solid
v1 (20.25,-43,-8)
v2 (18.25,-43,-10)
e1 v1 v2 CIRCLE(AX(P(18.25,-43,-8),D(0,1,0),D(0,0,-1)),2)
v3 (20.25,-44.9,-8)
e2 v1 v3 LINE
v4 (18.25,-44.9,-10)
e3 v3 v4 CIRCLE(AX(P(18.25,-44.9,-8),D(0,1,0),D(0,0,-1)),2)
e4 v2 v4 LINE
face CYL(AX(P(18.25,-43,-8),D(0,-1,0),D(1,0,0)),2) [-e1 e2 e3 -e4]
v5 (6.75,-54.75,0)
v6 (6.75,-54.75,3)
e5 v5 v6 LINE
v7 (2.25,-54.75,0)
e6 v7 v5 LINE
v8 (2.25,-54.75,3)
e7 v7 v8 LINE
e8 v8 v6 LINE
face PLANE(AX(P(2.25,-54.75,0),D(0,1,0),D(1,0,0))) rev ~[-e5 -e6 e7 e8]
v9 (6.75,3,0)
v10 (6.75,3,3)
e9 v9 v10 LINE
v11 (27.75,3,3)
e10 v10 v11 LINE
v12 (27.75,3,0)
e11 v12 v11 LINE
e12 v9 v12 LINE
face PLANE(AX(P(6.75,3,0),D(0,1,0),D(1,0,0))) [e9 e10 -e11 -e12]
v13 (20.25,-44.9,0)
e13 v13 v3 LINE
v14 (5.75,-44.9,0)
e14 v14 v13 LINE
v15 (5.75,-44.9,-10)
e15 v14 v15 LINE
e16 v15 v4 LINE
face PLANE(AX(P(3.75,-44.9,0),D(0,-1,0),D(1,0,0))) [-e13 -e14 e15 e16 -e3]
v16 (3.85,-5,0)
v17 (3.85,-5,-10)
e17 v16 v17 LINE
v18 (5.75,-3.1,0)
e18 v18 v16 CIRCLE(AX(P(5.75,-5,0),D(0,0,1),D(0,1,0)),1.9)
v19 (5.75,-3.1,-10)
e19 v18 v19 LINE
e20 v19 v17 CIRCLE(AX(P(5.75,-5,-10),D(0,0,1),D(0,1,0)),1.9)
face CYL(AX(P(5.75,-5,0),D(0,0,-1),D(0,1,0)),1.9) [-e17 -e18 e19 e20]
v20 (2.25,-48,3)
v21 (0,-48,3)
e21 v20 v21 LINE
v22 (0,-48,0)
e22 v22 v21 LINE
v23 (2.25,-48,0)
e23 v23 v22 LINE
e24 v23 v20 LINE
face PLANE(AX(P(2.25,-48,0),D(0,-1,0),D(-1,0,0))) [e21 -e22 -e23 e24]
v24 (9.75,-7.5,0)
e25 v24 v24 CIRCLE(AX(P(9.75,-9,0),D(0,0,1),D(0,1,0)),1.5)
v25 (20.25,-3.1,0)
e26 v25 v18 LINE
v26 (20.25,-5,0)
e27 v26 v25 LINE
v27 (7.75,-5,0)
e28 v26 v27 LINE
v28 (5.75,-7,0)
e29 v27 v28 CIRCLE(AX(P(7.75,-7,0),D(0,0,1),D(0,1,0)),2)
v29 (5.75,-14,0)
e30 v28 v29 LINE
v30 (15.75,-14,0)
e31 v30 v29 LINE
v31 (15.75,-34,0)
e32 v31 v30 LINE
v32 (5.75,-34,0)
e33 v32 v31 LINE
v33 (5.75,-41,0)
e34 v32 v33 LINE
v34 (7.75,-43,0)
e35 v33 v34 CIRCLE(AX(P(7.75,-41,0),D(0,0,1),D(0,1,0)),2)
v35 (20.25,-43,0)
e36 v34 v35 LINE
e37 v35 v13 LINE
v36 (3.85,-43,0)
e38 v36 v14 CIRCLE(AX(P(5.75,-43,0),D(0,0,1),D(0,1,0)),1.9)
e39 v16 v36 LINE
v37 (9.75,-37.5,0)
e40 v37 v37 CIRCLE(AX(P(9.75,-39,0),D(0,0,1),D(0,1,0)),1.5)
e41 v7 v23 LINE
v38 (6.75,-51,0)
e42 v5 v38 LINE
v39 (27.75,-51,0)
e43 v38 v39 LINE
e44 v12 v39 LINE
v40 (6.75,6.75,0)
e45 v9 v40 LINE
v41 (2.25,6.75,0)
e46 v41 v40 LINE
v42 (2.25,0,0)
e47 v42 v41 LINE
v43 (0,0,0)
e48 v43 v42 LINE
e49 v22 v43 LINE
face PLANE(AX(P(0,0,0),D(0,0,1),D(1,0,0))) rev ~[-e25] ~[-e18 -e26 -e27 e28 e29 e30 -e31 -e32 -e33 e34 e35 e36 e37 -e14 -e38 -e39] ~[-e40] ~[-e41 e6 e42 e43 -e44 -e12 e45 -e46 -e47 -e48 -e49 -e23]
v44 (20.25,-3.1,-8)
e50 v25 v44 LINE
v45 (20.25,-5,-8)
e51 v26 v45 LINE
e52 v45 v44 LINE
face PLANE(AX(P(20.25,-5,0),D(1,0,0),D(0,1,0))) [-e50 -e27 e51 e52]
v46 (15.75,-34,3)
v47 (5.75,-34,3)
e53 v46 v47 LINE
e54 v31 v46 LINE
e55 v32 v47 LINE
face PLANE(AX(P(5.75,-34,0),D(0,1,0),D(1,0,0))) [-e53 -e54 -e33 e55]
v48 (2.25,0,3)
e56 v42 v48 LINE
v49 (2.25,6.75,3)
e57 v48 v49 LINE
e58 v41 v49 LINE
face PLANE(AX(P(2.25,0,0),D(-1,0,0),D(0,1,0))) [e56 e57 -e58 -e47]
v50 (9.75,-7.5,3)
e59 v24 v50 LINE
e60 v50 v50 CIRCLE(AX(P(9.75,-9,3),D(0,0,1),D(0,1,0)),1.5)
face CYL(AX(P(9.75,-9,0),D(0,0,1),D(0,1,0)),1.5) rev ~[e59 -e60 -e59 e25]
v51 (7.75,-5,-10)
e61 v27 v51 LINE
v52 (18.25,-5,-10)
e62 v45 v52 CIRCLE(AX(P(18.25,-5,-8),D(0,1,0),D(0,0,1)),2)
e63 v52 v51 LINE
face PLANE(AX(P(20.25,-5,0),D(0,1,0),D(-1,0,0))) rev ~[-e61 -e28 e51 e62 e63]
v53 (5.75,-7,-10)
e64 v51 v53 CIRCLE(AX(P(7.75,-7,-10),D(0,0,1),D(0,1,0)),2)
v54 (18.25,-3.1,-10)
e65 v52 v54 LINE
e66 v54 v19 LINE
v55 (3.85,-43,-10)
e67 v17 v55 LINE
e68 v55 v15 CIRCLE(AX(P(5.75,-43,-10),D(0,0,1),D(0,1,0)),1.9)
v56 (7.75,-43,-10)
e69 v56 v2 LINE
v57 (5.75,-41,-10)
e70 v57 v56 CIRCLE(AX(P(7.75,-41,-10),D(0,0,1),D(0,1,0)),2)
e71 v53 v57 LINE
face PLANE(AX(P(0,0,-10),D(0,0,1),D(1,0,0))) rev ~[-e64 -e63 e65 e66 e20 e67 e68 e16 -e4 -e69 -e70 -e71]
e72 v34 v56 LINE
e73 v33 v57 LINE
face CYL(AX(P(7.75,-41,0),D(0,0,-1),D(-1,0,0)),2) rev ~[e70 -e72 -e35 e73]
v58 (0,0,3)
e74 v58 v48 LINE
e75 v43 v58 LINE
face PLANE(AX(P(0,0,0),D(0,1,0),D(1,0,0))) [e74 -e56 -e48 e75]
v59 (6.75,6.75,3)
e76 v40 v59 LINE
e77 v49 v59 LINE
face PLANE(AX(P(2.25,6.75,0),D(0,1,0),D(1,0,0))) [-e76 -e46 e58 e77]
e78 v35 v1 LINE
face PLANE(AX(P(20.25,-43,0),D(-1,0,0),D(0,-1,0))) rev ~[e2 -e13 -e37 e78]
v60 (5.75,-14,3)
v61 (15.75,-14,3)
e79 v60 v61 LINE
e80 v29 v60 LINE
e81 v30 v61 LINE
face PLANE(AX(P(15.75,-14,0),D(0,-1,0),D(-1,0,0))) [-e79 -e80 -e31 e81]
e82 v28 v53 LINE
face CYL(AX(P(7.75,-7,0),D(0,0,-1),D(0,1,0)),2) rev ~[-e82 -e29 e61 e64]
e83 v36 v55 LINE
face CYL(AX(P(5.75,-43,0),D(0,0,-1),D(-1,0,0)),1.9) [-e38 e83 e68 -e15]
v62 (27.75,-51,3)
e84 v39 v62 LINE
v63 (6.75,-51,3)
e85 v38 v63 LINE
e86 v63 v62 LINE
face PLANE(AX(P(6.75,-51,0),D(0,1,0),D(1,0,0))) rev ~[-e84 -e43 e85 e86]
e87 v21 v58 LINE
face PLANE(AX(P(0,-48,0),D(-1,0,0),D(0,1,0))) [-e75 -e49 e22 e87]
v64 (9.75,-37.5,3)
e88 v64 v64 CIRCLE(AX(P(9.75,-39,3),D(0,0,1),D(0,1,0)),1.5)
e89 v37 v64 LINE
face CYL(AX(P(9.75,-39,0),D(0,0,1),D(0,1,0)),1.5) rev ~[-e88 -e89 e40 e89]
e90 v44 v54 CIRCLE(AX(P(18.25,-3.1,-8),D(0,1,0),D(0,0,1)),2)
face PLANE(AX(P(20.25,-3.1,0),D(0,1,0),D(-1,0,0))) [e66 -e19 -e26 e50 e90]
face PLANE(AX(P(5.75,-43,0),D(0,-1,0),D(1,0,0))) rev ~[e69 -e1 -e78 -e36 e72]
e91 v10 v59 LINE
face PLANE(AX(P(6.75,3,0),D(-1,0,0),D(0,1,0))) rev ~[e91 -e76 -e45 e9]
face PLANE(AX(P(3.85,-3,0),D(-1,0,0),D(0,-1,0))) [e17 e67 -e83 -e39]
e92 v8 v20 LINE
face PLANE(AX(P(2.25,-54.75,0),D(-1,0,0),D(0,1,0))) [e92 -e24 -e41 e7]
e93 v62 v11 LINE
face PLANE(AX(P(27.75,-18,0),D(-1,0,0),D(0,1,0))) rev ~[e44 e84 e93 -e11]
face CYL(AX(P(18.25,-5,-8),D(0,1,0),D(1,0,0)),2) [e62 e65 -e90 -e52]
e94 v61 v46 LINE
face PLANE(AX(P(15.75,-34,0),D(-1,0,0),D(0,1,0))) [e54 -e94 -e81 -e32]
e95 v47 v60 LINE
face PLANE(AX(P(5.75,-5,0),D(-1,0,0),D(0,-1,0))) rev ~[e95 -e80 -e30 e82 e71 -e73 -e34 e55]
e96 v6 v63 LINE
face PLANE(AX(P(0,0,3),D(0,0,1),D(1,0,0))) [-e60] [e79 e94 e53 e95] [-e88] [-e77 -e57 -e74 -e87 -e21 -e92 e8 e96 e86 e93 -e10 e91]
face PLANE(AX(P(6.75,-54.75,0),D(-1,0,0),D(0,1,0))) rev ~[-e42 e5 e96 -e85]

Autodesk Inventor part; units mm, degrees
ref_plane "YZ Plane" through (0, 0, 0) normal (1, 0, 0) x (0, 1, 0)
ref_plane "XZ Plane" through (0, 0, 0) normal (0, 1, 0) x (-1, 0, 0)
ref_plane "XY Plane" through (0, 0, 0) normal (0, 0, 1) x (1, 0, 0)
ref_plane "Work Plane1" through (0, 0, 0) normal (0, 0, 1) x (1, 0, 0)
sketch "Sketch1" plane through (0, 0, 0) normal (0, 0, 1) x (1, 0, 0)
  line L0 (0, 0) -> (23.25, 0) projected
  line L1 (0, -48) -> (0, 0) projected
  line L2 (23.25, -48) -> (0, -48) projected
  line L3 (23.25, -48) -> (23.25, -31.5) projected
  line L4 (23.25, -31.5) -> (26.25, -31.5) projected
  line L5 (27.75, -30) -> (26.25, -31.5) projected
  line L6 (27.75, -30) -> (27.75, -18) projected
  line L7 (27.75, -18) -> (26.25, -16.5) projected
  line L8 (23.25, -16.5) -> (26.25, -16.5) projected
  line L9 (23.25, 0) -> (23.25, -16.5) projected
  line L10 (20.25, -16.5) -> (20.25, -3) projected
  line L11 (17.25, -16.5) -> (20.25, -16.5) projected
  line L12 (17.25, -16.5) -> (17.25, -19.5) projected
  line L13 (26.25, -19.5) -> (26.25, -28.5) projected
  line L14 (17.25, -28.5) -> (17.25, -31.5) projected
  line L15 (17.25, -31.5) -> (20.25, -31.5) projected
  line L16 (20.25, -31.5) -> (20.25, -45) projected
  line L17 (3.75, -45) -> (20.25, -45) projected
  line L18 (3.75, -3) -> (3.75, -45) projected
  line L19 (20.25, -3) -> (3.75, -3) projected
  line L20 (17.25, -19.5) -> (17.25, -28.5)
  line L21 (18.25, -33.5) -> (15.25, -33.5)
  line L22 (15.25, -33.5) -> (15.25, -28.5)
  line L23 (15.25, -28.5) -> (15.25, -19.5)
  line L24 (15.25, -19.5) -> (15.25, -14.5)
  line L25 (15.25, -14.5) -> (18.25, -14.5)
  line L26 (20.25, -5) -> (5.75, -5)
  line L27 (5.75, -5) -> (5.75, -43)
  line L28 (5.75, -43) -> (20.25, -43)
extrude "Extrusion1" add sketch "Sketch1" against normal blind 10 contours L26 L27 L28 L16 L17 L18 L19 L10
sketch "Sketch2" plane through (0, 0, 0) normal (0, 0, 1) x (1, 0, 0)
  line L0 (2.25, 0) -> (2.25, 6.75) projected
  line L1 (2.25, 0) -> (3.3, 0) projected
  line L2 (3.3, 0) -> (3.3, 5.7) projected
  line L3 (5.7, 5.7) -> (3.3, 5.7) projected
  line L4 (5.7, 1.95) -> (5.7, 5.7) projected
  line L5 (26.7, 1.95) -> (5.7, 1.95) projected
  line L6 (26.7, 1.95) -> (26.7, -16.95) projected
  line L7 (26.7, -16.95) -> (27.75, -18) projected
  line L8 (27.75, -18) -> (27.75, 3) projected
  line L9 (6.75, 3) -> (27.75, 3) projected
  line L10 (6.75, 3) -> (6.75, 6.75) projected
  line L11 (2.25, 6.75) -> (6.75, 6.75) projected
  line L12 (2.25, -54.75) -> (2.25, -48) projected
  line L13 (2.25, -54.75) -> (6.75, -54.75) projected
  line L14 (6.75, -54.75) -> (6.75, -51) projected
  line L15 (6.75, -51) -> (27.75, -51) projected
  line L16 (27.75, -51) -> (27.75, -30) projected
  line L17 (26.7, -31.05) -> (27.75, -30) projected
  line L18 (26.7, -31.05) -> (26.7, -49.95) projected
  line L19 (26.7, -49.95) -> (5.7, -49.95) projected
  line L20 (5.7, -49.95) -> (5.7, -53.7) projected
  line L21 (3.3, -53.7) -> (5.7, -53.7) projected
  line L22 (3.3, -53.7) -> (3.3, -48) projected
  line L23 (2.25, -48) -> (3.3, -48) projected
  line L24 (0, 0) -> (23.25, 0) projected
  line L25 (0, -48) -> (0, 0) projected
  line L26 (23.25, -48) -> (0, -48) projected
  line L27 (23.25, -48) -> (23.25, -31.5) projected
  line L28 (23.25, -31.5) -> (26.25, -31.5) projected
  line L29 (27.75, -30) -> (26.25, -31.5) projected
  line L30 (27.75, -30) -> (27.75, -18) projected
  line L31 (27.75, -18) -> (26.25, -16.5) projected
  line L32 (23.25, -16.5) -> (26.25, -16.5) projected
  line L33 (23.25, 0) -> (23.25, -16.5) projected
  line L34 (20.25, -16.5) -> (20.25, -3) projected
  line L35 (17.25, -16.5) -> (20.25, -16.5) projected
  line L36 (17.25, -16.5) -> (17.25, -19.5) projected
  line L37 (17.25, -19.5) -> (26.25, -19.5) projected
  line L38 (26.25, -19.5) -> (26.25, -28.5) projected
  line L39 (17.25, -28.5) -> (26.25, -28.5) projected
  line L40 (17.25, -28.5) -> (17.25, -31.5) projected
  line L41 (17.25, -31.5) -> (20.25, -31.5) projected
  line L42 (20.25, -31.5) -> (20.25, -45) projected
  line L43 (3.75, -45) -> (20.25, -45) projected
  line L44 (3.75, -3) -> (3.75, -45) projected
  line L45 (20.25, -3) -> (3.75, -3) projected
extrude "Extrusion2" add sketch "Sketch2" along normal blind 3 contours L0 L11 L10 L9 L8 L7 L6 L5 L4 L3 L2 L1 | L1 L24 L33 L32 L31 L7 L30 L17 L29 L28 L27 L26 L23 L25 | L2 L3 L4 L5 L6 L31 L32 L33 L24 | L23 L22 L21 L20 L19 L18 L17 L16 L15 L14 L13 L12 | L26 L27 L28 L29 L18 L19 L20 L21 L22 | L35 L36 L37 L38 L39 L40 L41 L42 L43 L44 L45 L34
sketch "Sketch3" plane through (0, 0, 0) normal (0, 0, -1) x (-1, 0, 0)
  line L0 (-5.75, -34) -> (-15.75, -34)
  line L1 (-15.75, -34) -> (-15.75, -14)
  line L2 (-15.75, -14) -> (-5.75, -14)
  line L3 (-5.75, -14) -> (-5.75, -34)
  line L4 (-3.75, -45) -> (-3.75, -3) construction
  line L5 (-3.75, -24) -> (-33.6662, -24) construction
  line L6 (-5.75, -5) -> (-5.75, -43) construction
  point P0 (0, 0)
  dimension "d5" = 10
  dimension "d6" = 20
extrude "Extrusion3" cut sketch "Sketch3" against normal through all
sketch "Sketch4" plane through (0, 0, 0) normal (0, 0, -1) x (-1, 0, 0)
  line L0 (-20.25, -5) -> (-5.75, -5) projected
  line L1 (-5.75, -43) -> (-20.25, -43) projected
  line L2 (-5.75, -5) -> (-5.75, -43) projected
  point P0 (0, 0)
  point P1 (-9.75, -9)
  point P2 (-9.75, -39)
  dimension "d9" = 4
  dimension "d10" = 4
  dimension "d11" = 4
  dimension "d12" = 4
hole "Hole1" at (9.75, -9, 0) at (9.75, -39, 0) direction (0, 0, 1) diameter 3 end through all
fillet "Fillet1" radius 2 6 edges at (20.25, -4, -10) (20.25, -44, -10) (3.75, -3, -5) (3.75, -45, -5) (5.75, -43, -5) (5.75, -5, -5)
thicken "Thicken1" operation add thickness 0.1 both sides no extend neighbours yes toward (0, 1, 0) faces at (14.75, -45, -3.3333) (4.75, -44.732, -3.3333) (3.75, -17.6667, -3.3333) (4.2839, -3.6397, -3.3333) (14.75, -3, -3.3333)
equation "\"d12\" = d11"
properties part number "camera_holder"
